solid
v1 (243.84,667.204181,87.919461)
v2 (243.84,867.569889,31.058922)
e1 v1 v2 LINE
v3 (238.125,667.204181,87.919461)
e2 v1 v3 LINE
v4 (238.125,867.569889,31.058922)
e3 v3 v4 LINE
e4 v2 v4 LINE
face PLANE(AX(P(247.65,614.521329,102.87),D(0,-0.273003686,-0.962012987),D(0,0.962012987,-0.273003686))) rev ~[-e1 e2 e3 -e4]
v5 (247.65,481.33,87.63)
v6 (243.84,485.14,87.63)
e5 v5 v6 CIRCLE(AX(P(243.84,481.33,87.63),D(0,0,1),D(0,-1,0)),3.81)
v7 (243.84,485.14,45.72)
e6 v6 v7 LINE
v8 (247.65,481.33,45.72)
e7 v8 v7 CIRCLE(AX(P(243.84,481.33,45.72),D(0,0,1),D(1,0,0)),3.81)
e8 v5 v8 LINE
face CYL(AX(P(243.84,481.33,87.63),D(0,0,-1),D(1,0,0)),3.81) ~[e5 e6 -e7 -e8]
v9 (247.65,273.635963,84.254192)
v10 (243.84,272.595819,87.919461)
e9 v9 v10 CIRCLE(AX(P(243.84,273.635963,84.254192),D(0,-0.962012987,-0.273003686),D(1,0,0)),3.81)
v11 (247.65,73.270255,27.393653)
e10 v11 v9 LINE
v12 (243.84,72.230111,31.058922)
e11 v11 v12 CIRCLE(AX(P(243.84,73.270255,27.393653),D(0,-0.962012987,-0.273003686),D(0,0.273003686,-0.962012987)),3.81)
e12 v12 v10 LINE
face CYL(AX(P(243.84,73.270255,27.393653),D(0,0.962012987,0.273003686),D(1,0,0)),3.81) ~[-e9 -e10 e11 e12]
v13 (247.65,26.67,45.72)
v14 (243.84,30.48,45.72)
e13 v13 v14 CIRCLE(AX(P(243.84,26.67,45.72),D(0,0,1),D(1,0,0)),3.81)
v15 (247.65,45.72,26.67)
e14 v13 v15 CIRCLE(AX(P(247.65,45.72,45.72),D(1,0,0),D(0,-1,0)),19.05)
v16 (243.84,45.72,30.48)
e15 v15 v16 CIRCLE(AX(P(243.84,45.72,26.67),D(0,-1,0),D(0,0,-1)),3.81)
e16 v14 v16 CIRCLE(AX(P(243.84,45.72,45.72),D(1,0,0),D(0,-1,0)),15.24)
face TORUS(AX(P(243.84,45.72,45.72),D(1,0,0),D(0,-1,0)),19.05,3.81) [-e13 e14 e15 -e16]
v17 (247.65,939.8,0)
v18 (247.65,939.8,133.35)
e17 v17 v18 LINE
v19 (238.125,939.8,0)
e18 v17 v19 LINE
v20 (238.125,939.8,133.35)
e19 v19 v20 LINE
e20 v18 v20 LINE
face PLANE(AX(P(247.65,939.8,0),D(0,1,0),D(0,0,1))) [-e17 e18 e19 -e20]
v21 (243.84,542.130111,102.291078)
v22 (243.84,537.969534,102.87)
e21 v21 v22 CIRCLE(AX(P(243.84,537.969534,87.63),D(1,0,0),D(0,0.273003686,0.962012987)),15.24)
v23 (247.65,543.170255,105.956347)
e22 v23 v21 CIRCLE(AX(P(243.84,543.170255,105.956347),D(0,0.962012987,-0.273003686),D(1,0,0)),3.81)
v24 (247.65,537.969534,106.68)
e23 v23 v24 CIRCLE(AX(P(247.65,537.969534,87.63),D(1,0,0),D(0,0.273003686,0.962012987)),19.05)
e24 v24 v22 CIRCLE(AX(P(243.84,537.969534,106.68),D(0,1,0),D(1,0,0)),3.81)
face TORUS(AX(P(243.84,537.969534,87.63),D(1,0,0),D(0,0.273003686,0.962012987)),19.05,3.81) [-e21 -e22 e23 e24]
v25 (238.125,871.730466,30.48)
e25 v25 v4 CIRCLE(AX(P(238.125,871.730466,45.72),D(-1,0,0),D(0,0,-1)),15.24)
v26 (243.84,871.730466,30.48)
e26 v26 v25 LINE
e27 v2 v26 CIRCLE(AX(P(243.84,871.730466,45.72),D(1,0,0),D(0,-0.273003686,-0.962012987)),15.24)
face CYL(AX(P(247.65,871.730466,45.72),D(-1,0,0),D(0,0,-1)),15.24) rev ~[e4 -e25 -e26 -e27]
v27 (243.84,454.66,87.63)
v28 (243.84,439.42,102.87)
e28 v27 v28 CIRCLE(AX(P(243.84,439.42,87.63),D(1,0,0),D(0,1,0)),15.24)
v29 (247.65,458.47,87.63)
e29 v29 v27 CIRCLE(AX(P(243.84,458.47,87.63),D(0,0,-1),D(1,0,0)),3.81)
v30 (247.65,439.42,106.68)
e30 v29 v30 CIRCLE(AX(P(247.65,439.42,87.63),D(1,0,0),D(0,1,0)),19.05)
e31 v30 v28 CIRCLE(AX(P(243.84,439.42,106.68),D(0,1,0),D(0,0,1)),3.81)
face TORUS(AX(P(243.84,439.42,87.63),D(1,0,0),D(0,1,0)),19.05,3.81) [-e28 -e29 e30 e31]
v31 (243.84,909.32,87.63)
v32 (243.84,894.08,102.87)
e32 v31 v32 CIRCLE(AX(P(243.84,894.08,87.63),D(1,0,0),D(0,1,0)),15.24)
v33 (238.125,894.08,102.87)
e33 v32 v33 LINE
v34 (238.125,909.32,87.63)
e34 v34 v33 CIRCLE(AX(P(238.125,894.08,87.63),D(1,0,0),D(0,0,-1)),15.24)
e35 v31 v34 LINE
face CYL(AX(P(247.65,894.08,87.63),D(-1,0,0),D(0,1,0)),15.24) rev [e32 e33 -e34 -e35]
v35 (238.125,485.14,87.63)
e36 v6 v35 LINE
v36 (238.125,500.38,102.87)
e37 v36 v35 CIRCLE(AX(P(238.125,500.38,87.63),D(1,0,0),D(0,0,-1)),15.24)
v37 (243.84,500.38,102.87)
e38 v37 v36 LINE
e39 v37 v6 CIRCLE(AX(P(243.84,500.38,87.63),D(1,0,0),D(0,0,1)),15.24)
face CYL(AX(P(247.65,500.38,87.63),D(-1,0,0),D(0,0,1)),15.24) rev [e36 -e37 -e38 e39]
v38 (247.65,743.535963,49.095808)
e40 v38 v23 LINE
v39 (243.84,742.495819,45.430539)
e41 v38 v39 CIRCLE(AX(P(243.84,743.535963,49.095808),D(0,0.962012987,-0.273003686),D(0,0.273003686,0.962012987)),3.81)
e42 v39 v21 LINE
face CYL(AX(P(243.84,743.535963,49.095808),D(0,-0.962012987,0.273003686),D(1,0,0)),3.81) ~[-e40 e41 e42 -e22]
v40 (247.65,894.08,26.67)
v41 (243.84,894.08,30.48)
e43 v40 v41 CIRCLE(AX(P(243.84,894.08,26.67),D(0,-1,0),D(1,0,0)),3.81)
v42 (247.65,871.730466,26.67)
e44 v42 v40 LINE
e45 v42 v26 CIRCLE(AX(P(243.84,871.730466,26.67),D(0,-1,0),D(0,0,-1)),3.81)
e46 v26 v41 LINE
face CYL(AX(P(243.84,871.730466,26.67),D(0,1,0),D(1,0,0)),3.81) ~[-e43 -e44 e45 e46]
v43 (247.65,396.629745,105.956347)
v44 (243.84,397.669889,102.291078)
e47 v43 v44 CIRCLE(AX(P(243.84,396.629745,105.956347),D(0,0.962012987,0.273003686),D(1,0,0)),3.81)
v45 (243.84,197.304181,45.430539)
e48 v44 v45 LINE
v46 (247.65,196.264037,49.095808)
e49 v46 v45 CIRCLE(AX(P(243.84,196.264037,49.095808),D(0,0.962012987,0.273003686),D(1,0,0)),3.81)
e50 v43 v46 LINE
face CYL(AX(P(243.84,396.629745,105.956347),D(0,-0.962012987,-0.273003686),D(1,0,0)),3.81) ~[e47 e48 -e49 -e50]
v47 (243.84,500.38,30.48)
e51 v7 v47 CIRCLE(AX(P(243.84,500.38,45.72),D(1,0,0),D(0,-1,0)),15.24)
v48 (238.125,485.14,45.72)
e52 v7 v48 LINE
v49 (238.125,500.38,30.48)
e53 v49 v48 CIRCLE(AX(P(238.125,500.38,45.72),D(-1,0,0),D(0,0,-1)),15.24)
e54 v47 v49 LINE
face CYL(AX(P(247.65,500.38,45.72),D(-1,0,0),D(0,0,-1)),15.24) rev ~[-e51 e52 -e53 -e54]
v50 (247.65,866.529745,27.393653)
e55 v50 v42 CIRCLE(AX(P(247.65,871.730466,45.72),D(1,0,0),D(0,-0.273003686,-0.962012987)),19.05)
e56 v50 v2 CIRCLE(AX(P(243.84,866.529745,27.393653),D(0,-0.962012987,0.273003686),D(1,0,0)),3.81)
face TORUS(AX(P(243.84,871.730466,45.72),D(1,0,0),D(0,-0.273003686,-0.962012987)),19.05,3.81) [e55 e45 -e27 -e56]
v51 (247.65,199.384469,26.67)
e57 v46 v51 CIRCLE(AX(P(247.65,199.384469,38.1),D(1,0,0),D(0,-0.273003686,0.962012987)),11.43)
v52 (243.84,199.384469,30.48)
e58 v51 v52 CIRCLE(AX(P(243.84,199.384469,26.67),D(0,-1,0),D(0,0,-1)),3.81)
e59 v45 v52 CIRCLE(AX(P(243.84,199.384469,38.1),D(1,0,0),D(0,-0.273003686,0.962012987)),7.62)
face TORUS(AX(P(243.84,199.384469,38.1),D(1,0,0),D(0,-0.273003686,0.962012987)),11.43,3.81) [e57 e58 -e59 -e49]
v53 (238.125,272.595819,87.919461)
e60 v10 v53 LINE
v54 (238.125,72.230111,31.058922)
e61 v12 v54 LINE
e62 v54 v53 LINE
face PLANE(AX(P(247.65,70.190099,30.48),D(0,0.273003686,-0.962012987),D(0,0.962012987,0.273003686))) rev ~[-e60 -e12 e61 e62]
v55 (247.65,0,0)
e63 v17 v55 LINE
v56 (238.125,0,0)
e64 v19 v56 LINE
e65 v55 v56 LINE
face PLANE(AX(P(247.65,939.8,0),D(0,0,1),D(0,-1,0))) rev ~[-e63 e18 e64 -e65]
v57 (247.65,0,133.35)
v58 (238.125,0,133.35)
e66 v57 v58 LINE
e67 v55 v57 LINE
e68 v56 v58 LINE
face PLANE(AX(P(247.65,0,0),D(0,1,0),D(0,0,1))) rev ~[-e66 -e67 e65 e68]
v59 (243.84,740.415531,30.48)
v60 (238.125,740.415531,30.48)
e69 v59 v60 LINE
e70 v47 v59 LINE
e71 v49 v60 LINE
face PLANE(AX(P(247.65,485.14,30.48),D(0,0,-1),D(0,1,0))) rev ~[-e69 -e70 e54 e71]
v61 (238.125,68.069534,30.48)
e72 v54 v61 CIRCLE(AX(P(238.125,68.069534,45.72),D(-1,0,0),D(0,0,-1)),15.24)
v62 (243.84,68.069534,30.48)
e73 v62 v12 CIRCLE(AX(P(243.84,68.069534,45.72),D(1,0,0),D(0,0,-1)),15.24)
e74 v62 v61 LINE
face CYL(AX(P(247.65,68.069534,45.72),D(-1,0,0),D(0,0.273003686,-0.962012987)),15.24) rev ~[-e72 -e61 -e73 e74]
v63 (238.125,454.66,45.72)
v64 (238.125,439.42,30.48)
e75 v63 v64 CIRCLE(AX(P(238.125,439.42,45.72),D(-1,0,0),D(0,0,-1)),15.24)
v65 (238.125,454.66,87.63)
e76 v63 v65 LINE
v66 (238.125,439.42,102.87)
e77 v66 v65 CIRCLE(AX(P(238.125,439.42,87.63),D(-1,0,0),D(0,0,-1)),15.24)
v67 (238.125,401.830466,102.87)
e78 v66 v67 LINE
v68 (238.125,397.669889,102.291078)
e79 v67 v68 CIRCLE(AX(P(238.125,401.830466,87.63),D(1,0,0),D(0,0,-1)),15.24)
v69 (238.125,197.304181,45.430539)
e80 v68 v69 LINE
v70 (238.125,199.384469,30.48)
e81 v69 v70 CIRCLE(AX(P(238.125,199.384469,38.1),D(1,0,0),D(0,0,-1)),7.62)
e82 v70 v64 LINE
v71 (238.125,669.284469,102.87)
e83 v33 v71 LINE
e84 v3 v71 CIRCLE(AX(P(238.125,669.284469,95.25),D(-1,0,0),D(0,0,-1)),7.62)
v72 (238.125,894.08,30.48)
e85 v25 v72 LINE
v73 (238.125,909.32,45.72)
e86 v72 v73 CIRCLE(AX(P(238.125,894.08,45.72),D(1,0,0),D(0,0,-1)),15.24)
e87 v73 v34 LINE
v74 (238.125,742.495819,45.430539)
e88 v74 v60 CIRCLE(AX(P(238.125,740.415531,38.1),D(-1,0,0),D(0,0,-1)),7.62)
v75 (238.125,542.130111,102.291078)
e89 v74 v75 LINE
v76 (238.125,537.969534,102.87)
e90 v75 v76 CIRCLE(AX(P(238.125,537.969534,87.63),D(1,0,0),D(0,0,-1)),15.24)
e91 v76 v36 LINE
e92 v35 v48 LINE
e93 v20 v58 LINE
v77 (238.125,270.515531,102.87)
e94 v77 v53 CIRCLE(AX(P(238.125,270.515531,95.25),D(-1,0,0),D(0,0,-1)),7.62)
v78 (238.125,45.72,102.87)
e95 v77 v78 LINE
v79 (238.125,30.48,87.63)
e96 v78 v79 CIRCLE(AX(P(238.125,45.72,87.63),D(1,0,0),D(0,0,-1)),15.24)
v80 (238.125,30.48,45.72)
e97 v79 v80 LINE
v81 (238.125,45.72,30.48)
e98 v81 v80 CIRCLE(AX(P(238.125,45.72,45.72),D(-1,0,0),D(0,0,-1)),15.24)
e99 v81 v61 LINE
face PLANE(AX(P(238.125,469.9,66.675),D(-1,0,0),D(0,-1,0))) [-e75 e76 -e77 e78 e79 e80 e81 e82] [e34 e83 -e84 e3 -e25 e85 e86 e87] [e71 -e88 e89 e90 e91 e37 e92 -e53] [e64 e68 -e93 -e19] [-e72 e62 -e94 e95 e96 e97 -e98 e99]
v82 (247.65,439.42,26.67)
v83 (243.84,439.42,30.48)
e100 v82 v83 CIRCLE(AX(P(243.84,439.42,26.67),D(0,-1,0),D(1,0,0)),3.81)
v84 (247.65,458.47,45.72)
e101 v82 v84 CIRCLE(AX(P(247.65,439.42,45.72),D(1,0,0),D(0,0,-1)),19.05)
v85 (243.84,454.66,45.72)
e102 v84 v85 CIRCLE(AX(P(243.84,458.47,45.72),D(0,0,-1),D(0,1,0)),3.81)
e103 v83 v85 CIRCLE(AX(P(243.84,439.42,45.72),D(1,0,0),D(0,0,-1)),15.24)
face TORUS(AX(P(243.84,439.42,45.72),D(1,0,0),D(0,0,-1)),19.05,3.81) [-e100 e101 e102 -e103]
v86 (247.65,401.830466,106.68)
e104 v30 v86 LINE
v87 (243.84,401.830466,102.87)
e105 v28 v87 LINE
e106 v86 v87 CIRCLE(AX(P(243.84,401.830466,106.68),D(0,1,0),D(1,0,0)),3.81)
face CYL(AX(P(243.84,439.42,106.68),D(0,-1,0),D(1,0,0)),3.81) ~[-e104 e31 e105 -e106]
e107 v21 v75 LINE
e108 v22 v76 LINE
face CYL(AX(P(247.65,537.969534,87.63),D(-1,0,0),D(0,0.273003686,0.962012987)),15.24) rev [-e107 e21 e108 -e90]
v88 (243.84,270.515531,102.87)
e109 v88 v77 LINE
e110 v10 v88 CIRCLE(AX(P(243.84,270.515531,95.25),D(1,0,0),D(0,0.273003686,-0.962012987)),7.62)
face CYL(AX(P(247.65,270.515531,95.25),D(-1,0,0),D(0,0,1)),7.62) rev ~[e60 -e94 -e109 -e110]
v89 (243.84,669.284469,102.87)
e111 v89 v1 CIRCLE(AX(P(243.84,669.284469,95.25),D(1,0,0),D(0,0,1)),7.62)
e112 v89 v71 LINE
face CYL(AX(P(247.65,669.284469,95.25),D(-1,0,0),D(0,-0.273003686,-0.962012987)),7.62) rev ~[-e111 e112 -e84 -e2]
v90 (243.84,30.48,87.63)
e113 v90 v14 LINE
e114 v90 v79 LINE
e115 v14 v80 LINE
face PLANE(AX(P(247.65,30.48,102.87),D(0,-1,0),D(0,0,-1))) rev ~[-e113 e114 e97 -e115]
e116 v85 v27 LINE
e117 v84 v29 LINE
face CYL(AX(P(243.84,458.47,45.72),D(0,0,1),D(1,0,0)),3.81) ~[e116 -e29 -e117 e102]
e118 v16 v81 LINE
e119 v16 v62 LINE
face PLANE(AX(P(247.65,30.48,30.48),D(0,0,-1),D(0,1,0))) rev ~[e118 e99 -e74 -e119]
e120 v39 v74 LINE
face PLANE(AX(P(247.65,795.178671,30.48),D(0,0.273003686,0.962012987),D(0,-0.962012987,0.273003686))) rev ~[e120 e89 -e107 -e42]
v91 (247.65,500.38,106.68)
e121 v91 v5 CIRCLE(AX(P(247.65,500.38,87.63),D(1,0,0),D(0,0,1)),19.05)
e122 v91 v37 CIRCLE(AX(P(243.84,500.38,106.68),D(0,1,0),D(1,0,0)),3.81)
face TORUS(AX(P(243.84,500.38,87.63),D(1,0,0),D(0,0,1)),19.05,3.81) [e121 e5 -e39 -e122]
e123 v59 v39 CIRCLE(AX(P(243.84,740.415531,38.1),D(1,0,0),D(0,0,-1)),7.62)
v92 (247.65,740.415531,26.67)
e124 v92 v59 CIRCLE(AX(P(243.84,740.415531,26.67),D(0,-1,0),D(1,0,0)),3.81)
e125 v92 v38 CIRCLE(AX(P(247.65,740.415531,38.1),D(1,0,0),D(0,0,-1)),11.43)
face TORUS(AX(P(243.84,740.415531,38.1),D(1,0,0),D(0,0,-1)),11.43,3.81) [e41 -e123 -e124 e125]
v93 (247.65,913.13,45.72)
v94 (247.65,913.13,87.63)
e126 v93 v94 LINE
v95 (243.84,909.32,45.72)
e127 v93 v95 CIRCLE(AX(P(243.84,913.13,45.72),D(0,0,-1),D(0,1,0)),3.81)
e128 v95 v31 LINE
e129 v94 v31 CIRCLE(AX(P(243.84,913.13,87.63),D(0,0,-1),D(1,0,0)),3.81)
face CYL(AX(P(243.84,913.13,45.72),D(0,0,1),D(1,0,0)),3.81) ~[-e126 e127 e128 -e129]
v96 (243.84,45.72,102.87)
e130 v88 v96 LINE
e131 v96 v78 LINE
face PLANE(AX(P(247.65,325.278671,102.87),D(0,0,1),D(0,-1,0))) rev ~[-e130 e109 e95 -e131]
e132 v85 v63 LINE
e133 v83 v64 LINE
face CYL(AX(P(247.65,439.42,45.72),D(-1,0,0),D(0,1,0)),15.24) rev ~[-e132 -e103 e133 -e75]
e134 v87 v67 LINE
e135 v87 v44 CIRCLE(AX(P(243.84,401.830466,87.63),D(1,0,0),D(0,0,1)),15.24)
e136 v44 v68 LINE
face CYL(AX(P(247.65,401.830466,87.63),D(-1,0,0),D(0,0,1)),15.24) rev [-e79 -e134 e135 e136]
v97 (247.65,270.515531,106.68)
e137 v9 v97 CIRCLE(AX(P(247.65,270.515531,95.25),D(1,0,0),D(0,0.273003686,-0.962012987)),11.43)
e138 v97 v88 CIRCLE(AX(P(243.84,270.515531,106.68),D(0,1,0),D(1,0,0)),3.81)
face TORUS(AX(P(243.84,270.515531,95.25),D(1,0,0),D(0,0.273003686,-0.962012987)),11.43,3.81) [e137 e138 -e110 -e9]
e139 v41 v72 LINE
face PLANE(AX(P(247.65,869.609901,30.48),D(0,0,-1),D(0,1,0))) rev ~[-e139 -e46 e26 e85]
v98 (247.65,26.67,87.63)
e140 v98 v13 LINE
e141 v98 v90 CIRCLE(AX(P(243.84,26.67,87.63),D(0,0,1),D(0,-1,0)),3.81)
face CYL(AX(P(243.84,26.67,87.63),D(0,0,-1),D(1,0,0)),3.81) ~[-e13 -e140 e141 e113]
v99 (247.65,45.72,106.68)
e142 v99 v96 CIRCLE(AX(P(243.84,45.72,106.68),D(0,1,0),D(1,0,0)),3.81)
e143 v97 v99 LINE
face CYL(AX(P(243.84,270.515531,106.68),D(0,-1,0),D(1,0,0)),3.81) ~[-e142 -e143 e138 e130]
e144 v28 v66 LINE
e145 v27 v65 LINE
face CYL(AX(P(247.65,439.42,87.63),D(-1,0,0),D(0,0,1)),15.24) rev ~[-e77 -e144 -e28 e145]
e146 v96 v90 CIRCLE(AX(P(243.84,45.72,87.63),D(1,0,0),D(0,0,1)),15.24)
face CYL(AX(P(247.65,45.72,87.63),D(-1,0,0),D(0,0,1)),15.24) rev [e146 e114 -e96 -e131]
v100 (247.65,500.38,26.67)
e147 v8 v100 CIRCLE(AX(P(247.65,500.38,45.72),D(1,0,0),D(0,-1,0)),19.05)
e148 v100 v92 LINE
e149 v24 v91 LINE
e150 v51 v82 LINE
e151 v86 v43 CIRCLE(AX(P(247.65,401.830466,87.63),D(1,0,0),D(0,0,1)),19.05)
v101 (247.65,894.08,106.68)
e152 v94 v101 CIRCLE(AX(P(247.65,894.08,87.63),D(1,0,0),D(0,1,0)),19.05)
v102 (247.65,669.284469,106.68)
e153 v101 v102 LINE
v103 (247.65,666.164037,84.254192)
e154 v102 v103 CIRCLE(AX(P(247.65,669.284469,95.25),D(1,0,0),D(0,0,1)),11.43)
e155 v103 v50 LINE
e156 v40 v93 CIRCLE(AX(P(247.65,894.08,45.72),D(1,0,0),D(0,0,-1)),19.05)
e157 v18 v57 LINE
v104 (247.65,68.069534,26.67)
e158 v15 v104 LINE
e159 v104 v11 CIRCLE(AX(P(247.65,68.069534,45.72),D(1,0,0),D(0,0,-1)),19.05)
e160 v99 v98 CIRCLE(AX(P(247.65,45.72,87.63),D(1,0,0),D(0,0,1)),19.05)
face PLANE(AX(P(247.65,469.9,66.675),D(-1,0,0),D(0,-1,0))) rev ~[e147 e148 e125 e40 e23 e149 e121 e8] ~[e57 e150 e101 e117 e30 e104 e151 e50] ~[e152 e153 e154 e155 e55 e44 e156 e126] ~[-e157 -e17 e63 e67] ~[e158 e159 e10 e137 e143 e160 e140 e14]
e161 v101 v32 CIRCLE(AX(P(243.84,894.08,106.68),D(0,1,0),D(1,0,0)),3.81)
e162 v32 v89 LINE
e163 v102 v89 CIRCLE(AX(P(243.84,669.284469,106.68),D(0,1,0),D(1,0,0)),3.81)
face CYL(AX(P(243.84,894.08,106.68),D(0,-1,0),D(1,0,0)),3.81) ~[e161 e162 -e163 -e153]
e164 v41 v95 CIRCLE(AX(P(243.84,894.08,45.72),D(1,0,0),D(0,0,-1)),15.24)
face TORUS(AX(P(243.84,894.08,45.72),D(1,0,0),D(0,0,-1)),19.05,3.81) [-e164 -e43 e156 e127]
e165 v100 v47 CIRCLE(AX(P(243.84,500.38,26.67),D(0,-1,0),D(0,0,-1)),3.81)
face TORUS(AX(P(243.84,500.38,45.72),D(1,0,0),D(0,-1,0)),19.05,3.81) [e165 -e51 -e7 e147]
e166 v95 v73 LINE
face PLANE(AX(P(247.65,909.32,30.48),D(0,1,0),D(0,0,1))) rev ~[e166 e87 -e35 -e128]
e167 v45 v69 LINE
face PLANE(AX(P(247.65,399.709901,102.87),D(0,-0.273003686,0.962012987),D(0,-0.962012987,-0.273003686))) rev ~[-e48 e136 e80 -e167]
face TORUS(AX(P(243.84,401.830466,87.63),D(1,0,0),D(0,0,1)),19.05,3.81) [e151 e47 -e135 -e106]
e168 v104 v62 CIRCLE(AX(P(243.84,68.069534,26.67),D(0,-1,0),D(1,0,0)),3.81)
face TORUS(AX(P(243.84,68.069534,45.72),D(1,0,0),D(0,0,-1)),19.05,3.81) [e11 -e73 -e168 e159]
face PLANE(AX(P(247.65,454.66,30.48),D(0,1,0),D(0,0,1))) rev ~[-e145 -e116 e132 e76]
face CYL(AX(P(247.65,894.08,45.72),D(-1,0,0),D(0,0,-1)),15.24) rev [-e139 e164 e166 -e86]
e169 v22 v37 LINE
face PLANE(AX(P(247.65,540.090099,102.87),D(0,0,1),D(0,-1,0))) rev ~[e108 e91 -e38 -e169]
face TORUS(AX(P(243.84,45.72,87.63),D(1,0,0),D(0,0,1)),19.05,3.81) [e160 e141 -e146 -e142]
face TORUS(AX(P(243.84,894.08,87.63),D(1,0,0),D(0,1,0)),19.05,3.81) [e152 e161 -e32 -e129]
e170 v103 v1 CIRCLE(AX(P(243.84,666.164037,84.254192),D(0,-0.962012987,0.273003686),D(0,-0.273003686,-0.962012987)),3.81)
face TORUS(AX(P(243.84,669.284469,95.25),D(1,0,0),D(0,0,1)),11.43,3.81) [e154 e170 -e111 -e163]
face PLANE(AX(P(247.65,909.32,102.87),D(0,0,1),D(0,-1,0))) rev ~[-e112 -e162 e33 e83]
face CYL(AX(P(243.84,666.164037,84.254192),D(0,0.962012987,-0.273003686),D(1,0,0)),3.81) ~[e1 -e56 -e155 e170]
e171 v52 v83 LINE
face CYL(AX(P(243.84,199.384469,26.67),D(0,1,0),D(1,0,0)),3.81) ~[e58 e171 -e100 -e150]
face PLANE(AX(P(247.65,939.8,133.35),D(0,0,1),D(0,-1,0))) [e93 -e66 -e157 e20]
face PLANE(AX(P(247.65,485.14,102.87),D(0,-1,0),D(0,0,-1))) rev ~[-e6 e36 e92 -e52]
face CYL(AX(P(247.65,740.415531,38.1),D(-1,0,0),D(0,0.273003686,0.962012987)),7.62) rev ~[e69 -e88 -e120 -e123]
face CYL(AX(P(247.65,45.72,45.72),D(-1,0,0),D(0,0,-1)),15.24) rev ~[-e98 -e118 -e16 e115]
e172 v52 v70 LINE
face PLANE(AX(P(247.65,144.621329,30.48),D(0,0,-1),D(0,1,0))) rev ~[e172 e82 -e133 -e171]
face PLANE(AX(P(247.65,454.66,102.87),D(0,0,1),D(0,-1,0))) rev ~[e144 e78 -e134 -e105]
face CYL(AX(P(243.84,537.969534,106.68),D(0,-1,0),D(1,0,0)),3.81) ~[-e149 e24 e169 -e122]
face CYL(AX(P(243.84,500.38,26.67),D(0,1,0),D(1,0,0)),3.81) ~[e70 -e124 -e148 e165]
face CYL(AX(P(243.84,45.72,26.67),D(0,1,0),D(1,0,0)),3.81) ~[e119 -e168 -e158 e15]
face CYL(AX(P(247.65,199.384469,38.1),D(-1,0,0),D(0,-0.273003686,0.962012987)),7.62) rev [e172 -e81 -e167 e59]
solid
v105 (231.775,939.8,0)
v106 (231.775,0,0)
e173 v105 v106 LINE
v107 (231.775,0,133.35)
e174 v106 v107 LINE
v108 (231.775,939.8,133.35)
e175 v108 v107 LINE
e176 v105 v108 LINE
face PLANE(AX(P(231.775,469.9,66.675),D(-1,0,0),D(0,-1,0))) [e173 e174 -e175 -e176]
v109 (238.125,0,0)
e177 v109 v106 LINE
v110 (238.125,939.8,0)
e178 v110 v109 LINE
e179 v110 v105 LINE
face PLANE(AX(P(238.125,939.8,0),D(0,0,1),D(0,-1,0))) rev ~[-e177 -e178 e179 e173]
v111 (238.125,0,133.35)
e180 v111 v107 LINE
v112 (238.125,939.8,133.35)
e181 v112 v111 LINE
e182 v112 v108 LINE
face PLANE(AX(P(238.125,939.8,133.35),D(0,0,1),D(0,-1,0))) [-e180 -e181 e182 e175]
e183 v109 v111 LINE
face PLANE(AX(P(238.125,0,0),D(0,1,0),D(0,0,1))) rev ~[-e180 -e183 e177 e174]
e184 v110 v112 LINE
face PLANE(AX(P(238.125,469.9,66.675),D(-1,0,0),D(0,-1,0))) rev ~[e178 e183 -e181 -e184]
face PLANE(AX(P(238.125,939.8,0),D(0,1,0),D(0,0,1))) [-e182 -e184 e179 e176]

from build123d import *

# Parameters (mm, degrees)
F2_W     = 939.8
F2_H     = 133.35
F3_DEPTH = 9.525
F4_R     = 15.24
F5_R     = 7.62
F6_R     = 3.81
F7_W     = 939.8
F7_H     = 133.35
F8_DEPTH = 6.35


with BuildPart() as f3:
    # F2 (on face) → F3 (new body)
    with BuildSketch(Plane(origin=(247.65, 0, 0), x_dir=(0, -1, 0), z_dir=(-1, 0, 0))):
        with Locations((-469.9, 66.675)):
            Rectangle(F2_W, F2_H)
        Polygon((-909.32, 30.48), (-909.32, 102.87), (-614.5213290809, 102.87), (-869.6099005094, 30.48), align=None, mode=Mode.SUBTRACT)
        Polygon((-540.0900994906, 102.87), (-485.14, 102.87), (-485.14, 30.48), (-795.1786709191, 30.48), align=None, mode=Mode.SUBTRACT)
        Polygon((-399.7099005094, 102.87), (-144.6213290809, 30.48), (-454.66, 30.48), (-454.66, 102.87), align=None, mode=Mode.SUBTRACT)
        Polygon((-30.48, 102.87), (-30.48, 30.48), (-70.1900994906, 30.48), (-325.2786709191, 102.87), align=None, mode=Mode.SUBTRACT)
    extrude(amount=F3_DEPTH)

    # F4
    f4_edges = [f3.edges().sort_by_distance(p)[0] for p in [
        (242.8875, 399.709901, 102.87),
        (242.8875, 454.66, 102.87),
        (242.8875, 454.66, 30.48),
        (242.8875, 30.48, 30.48),
        (242.8875, 30.48, 102.87),
        (242.8875, 70.190099, 30.48),
        (242.8875, 540.090099, 102.87),
        (242.8875, 485.14, 102.87),
        (242.8875, 485.14, 30.48),
        (242.8875, 909.32, 102.87),
        (242.8875, 909.32, 30.48),
        (242.8875, 869.609901, 30.48),
    ]]
    fillet(f4_edges, radius=F4_R)

    # F5
    f5_edges = [f3.edges().sort_by_distance(p)[0] for p in [
        (242.8875, 144.621329, 30.48),
        (242.8875, 614.521329, 102.87),
        (242.8875, 795.178671, 30.48),
        (242.8875, 325.278671, 102.87),
    ]]
    fillet(f5_edges, radius=F5_R)

    # F6
    f6_edges = [f3.edges().sort_by_distance(p)[0] for p in [
        (247.65, 158.117766, 102.87),
        (247.65, 297.487035, 73.860808),
        (247.65, 519.174767, 102.87),
        (247.65, 781.682234, 102.87),
    ]]
    fillet(f6_edges, radius=F6_R)


with BuildPart() as f8:
    # F7 (on face) → F8 (new body)
    with BuildSketch(Plane(origin=(238.125, 0, 0), x_dir=(0, -1, 0), z_dir=(-1, 0, 0))):
        with Locations((-469.9, 66.675)):
            Rectangle(F7_W, F7_H)
    extrude(amount=F8_DEPTH)


solid = Compound([f3.part, f8.part])
